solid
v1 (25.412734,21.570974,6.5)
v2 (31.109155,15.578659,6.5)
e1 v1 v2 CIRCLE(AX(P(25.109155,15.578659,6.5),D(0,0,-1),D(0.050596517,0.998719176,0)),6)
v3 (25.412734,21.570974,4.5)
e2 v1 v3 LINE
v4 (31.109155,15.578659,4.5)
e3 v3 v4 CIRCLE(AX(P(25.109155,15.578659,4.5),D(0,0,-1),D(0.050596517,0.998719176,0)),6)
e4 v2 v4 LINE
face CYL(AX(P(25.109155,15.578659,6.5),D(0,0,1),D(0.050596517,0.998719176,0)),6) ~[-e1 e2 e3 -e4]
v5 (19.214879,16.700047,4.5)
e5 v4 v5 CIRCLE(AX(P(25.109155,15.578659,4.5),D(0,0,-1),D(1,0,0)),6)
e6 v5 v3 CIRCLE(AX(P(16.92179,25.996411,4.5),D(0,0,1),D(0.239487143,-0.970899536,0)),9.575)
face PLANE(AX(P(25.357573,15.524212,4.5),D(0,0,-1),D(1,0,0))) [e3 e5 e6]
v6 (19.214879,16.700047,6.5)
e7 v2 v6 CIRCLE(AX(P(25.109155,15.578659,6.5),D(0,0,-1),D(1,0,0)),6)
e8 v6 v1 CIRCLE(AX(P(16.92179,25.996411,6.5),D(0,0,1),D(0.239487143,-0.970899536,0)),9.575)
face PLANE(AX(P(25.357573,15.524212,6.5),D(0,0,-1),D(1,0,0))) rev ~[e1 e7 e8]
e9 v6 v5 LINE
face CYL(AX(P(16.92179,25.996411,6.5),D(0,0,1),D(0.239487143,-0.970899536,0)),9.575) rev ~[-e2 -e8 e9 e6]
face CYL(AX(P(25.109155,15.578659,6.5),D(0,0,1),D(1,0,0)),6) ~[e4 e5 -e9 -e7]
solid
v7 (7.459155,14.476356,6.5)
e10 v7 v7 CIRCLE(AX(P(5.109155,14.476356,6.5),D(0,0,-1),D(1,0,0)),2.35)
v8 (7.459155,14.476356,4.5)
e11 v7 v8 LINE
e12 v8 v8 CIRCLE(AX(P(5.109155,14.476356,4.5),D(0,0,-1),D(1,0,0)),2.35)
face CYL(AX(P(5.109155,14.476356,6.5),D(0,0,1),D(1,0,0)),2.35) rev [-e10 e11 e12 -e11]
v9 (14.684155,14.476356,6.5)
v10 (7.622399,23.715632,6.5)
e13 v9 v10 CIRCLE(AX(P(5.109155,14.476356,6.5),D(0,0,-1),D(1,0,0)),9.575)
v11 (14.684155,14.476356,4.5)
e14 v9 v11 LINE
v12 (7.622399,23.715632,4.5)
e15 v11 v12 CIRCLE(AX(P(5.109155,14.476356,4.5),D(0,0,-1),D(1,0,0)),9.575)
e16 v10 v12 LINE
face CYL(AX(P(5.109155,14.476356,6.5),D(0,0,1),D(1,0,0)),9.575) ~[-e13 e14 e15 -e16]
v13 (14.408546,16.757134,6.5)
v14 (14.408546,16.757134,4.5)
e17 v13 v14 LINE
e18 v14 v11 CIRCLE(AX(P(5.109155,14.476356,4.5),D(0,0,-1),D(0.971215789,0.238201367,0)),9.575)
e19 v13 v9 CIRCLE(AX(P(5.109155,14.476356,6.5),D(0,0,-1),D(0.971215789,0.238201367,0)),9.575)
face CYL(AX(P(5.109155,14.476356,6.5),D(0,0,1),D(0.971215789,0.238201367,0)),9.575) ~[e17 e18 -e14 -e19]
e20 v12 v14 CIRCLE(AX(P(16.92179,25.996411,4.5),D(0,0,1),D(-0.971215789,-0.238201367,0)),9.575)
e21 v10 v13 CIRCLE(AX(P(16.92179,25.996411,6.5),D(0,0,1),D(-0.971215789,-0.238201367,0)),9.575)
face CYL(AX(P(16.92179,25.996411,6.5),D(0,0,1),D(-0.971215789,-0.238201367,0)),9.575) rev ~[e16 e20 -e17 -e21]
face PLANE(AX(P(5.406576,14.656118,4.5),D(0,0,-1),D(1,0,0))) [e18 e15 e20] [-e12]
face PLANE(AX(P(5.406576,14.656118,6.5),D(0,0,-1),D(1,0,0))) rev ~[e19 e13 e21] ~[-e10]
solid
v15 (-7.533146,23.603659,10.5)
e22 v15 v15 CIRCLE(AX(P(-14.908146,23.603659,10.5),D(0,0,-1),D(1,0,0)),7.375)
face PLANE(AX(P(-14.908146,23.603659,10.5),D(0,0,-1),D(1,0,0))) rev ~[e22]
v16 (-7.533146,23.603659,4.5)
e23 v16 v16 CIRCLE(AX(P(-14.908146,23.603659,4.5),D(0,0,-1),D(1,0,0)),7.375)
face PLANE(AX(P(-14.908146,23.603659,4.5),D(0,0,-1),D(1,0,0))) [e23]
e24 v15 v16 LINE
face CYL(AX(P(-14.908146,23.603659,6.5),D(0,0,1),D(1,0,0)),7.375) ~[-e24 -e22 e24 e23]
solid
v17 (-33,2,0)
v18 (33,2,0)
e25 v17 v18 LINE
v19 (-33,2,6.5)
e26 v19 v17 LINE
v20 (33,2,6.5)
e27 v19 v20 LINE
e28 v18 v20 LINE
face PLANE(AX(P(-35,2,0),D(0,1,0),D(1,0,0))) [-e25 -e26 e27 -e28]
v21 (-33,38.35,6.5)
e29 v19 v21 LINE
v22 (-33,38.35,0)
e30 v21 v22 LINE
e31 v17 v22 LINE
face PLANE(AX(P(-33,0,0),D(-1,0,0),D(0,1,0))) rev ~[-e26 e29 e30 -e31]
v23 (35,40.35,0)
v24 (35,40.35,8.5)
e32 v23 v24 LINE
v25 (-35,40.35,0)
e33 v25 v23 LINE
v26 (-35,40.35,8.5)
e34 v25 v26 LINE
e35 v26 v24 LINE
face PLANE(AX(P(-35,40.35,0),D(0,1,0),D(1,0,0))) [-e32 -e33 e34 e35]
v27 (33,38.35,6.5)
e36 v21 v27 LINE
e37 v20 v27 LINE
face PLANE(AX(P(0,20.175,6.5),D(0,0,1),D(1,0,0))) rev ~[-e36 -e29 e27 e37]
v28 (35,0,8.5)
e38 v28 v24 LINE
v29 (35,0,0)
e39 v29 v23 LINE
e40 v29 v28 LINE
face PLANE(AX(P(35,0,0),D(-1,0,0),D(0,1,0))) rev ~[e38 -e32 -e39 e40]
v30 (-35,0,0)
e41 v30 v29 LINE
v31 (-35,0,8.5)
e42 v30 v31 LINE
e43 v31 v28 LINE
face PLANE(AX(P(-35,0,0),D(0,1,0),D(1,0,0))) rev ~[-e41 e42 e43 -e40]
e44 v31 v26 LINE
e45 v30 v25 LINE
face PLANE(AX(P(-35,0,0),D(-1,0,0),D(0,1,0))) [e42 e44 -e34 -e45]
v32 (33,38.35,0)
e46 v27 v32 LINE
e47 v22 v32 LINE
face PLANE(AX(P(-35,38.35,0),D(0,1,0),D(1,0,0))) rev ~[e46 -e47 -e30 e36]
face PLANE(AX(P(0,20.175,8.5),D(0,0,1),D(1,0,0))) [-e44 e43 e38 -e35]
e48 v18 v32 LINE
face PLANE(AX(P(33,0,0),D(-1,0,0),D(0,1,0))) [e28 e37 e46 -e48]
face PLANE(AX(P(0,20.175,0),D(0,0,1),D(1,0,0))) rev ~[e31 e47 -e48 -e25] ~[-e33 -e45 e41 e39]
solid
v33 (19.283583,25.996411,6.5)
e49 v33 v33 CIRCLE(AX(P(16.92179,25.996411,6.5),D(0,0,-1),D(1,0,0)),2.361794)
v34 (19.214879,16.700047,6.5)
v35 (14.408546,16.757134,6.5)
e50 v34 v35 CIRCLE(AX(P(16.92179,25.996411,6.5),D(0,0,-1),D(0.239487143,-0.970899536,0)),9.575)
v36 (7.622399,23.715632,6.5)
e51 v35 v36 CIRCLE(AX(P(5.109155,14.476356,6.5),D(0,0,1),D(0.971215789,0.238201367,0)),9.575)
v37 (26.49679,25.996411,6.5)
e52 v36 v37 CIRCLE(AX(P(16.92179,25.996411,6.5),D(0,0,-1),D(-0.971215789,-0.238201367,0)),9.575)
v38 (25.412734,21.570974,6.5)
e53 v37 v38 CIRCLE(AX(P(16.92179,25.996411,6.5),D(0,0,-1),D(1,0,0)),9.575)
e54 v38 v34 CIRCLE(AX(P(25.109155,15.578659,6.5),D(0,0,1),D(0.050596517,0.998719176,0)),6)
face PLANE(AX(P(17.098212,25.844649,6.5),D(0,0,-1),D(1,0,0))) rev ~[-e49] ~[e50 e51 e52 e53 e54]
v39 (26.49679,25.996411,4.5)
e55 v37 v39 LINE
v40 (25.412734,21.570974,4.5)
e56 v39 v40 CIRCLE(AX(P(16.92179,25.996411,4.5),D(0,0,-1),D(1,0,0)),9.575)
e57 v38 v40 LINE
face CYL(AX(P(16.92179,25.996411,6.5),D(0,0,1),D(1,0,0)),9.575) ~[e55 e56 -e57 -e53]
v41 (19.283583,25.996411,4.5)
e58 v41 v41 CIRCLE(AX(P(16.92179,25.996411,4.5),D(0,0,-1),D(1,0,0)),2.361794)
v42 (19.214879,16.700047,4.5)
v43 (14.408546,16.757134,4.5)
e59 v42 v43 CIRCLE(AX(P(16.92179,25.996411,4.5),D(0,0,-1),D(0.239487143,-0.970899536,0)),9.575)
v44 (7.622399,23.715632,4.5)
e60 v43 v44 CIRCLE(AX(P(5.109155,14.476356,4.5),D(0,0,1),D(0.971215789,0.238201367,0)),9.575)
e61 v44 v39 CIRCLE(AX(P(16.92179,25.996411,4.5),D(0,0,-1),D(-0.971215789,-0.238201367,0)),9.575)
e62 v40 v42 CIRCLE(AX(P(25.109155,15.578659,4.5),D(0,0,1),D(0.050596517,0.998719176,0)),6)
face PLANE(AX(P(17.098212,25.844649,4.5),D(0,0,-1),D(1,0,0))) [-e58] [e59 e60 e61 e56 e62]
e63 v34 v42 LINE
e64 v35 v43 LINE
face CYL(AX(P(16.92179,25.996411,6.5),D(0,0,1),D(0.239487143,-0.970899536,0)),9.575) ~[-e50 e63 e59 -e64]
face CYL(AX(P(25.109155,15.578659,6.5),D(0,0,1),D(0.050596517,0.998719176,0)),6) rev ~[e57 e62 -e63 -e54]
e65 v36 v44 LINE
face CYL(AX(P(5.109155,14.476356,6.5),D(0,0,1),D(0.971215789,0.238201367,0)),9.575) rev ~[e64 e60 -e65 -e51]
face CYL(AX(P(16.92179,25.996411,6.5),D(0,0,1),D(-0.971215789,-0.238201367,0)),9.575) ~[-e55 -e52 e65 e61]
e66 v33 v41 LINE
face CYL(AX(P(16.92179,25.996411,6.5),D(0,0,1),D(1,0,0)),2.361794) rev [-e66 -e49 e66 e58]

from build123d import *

# Parameters (mm, degrees)
F0_W     = 70
F0_H     = 40.35
F1_DEPTH = 8.5
F2_T     = -2
F3_R     = 7.375
F4_DEPTH = 2
F3_R_2   = 2.3617937204
F3_R_3   = 2.35
F5_DEPTH = 6


with BuildPart() as f1:
    # F0 (on Top) → F1 (new body)
    with BuildSketch(Plane.XY):
        with Locations((0, 20.175)):
            Rectangle(F0_W, F0_H)
    extrude(amount=F1_DEPTH)

    # F2
    f2_openings = [f1.faces().sort_by_distance(p)[0] for p in [
        (0, 20.175, 0),
    ]]
    offset(amount=F2_T, openings=f2_openings)


with BuildPart() as f4:
    # F3 (on face) → F4 (new body)
    with BuildSketch(Plane(origin=(0, 0, 6.5), x_dir=(1, 0, 0), z_dir=(0, 0, -1))):
        with Locations((-14.9081461403, -23.6036587987)):
            Circle(F3_R)
    extrude(amount=F4_DEPTH)

    # F5 (add): a face of the model
    f5_faces = [f4.faces().sort_by_distance(p)[0] for p in [
        (-14.9081461403, 23.6036587987, 4.5),
    ]]
    extrude(f5_faces, amount=-F5_DEPTH)


with BuildPart() as f4b:
    # F3 (on face) → F4, piece 2 (new body)
    with BuildSketch(Plane(origin=(0, 0, 6.5), x_dir=(1, 0, 0), z_dir=(0, 0, -1))):
        with BuildLine():
            ThreePointArc((7.6223985069, -23.715632426), (15.7731046859, -35.5022585988), (26.4967896861, -25.9964105162))
            ThreePointArc((26.4967896861, -25.9964105162), (26.2218277724, -23.7182716719), (25.4127340008, -21.5709738546))
            ThreePointArc((25.4127340008, -21.5709738546), (21.4016687656, -20.2961312745), (19.2148790784, -16.7000474618))
            ThreePointArc((19.2148790784, -16.7000474618), (16.8080721143, -16.4220858238), (14.4085460796, -16.7571339441))
            ThreePointArc((14.4085460796, -16.7571339441), (11.9640626624, -21.1614784837), (7.6223985069, -23.715632426))
        make_face()
        with Locations((16.9217896861, -25.9964105162)):
            Circle(F3_R_2, mode=Mode.SUBTRACT)
    extrude(amount=F4_DEPTH)


with BuildPart() as f4c:
    # F3 (on face) → F4, piece 3 (new body)
    with BuildSketch(Plane(origin=(0, 0, 6.5), x_dir=(1, 0, 0), z_dir=(0, 0, -1))):
        with BuildLine():
            ThreePointArc((19.2148790784, -16.7000474618), (22.8383196429, -18.4681106901), (25.4127340008, -21.5709738546))
            ThreePointArc((25.4127340008, -21.5709738546), (29.4578026559, -19.7125749443), (31.1091549004, -15.5786587987))
            ThreePointArc((31.1091549004, -15.5786587987), (24.5459741711, -9.6051483177), (19.2148790784, -16.7000474618))
        make_face()
    extrude(amount=F4_DEPTH)


with BuildPart() as f4d:
    # F3 (on face) → F4, piece 4 (new body)
    with BuildSketch(Plane(origin=(0, 0, 6.5), x_dir=(1, 0, 0), z_dir=(0, 0, -1))):
        with BuildLine():
            ThreePointArc((14.6841549004, -14.4763558539), (-2.4982405978, -8.6618774823), (7.6223985069, -23.715632426))
            ThreePointArc((7.6223985069, -23.715632426), (10.0668819241, -19.3112878864), (14.4085460796, -16.7571339441))
            ThreePointArc((14.4085460796, -16.7571339441), (14.6150029831, -15.6250408542), (14.6841549004, -14.4763558539))
        make_face()
        with Locations((5.1091549004, -14.4763558539)):
            Circle(F3_R_3, mode=Mode.SUBTRACT)
    extrude(amount=F4_DEPTH)


solid = Compound([f1.part, f4.part, f4b.part, f4c.part, f4d.part])
